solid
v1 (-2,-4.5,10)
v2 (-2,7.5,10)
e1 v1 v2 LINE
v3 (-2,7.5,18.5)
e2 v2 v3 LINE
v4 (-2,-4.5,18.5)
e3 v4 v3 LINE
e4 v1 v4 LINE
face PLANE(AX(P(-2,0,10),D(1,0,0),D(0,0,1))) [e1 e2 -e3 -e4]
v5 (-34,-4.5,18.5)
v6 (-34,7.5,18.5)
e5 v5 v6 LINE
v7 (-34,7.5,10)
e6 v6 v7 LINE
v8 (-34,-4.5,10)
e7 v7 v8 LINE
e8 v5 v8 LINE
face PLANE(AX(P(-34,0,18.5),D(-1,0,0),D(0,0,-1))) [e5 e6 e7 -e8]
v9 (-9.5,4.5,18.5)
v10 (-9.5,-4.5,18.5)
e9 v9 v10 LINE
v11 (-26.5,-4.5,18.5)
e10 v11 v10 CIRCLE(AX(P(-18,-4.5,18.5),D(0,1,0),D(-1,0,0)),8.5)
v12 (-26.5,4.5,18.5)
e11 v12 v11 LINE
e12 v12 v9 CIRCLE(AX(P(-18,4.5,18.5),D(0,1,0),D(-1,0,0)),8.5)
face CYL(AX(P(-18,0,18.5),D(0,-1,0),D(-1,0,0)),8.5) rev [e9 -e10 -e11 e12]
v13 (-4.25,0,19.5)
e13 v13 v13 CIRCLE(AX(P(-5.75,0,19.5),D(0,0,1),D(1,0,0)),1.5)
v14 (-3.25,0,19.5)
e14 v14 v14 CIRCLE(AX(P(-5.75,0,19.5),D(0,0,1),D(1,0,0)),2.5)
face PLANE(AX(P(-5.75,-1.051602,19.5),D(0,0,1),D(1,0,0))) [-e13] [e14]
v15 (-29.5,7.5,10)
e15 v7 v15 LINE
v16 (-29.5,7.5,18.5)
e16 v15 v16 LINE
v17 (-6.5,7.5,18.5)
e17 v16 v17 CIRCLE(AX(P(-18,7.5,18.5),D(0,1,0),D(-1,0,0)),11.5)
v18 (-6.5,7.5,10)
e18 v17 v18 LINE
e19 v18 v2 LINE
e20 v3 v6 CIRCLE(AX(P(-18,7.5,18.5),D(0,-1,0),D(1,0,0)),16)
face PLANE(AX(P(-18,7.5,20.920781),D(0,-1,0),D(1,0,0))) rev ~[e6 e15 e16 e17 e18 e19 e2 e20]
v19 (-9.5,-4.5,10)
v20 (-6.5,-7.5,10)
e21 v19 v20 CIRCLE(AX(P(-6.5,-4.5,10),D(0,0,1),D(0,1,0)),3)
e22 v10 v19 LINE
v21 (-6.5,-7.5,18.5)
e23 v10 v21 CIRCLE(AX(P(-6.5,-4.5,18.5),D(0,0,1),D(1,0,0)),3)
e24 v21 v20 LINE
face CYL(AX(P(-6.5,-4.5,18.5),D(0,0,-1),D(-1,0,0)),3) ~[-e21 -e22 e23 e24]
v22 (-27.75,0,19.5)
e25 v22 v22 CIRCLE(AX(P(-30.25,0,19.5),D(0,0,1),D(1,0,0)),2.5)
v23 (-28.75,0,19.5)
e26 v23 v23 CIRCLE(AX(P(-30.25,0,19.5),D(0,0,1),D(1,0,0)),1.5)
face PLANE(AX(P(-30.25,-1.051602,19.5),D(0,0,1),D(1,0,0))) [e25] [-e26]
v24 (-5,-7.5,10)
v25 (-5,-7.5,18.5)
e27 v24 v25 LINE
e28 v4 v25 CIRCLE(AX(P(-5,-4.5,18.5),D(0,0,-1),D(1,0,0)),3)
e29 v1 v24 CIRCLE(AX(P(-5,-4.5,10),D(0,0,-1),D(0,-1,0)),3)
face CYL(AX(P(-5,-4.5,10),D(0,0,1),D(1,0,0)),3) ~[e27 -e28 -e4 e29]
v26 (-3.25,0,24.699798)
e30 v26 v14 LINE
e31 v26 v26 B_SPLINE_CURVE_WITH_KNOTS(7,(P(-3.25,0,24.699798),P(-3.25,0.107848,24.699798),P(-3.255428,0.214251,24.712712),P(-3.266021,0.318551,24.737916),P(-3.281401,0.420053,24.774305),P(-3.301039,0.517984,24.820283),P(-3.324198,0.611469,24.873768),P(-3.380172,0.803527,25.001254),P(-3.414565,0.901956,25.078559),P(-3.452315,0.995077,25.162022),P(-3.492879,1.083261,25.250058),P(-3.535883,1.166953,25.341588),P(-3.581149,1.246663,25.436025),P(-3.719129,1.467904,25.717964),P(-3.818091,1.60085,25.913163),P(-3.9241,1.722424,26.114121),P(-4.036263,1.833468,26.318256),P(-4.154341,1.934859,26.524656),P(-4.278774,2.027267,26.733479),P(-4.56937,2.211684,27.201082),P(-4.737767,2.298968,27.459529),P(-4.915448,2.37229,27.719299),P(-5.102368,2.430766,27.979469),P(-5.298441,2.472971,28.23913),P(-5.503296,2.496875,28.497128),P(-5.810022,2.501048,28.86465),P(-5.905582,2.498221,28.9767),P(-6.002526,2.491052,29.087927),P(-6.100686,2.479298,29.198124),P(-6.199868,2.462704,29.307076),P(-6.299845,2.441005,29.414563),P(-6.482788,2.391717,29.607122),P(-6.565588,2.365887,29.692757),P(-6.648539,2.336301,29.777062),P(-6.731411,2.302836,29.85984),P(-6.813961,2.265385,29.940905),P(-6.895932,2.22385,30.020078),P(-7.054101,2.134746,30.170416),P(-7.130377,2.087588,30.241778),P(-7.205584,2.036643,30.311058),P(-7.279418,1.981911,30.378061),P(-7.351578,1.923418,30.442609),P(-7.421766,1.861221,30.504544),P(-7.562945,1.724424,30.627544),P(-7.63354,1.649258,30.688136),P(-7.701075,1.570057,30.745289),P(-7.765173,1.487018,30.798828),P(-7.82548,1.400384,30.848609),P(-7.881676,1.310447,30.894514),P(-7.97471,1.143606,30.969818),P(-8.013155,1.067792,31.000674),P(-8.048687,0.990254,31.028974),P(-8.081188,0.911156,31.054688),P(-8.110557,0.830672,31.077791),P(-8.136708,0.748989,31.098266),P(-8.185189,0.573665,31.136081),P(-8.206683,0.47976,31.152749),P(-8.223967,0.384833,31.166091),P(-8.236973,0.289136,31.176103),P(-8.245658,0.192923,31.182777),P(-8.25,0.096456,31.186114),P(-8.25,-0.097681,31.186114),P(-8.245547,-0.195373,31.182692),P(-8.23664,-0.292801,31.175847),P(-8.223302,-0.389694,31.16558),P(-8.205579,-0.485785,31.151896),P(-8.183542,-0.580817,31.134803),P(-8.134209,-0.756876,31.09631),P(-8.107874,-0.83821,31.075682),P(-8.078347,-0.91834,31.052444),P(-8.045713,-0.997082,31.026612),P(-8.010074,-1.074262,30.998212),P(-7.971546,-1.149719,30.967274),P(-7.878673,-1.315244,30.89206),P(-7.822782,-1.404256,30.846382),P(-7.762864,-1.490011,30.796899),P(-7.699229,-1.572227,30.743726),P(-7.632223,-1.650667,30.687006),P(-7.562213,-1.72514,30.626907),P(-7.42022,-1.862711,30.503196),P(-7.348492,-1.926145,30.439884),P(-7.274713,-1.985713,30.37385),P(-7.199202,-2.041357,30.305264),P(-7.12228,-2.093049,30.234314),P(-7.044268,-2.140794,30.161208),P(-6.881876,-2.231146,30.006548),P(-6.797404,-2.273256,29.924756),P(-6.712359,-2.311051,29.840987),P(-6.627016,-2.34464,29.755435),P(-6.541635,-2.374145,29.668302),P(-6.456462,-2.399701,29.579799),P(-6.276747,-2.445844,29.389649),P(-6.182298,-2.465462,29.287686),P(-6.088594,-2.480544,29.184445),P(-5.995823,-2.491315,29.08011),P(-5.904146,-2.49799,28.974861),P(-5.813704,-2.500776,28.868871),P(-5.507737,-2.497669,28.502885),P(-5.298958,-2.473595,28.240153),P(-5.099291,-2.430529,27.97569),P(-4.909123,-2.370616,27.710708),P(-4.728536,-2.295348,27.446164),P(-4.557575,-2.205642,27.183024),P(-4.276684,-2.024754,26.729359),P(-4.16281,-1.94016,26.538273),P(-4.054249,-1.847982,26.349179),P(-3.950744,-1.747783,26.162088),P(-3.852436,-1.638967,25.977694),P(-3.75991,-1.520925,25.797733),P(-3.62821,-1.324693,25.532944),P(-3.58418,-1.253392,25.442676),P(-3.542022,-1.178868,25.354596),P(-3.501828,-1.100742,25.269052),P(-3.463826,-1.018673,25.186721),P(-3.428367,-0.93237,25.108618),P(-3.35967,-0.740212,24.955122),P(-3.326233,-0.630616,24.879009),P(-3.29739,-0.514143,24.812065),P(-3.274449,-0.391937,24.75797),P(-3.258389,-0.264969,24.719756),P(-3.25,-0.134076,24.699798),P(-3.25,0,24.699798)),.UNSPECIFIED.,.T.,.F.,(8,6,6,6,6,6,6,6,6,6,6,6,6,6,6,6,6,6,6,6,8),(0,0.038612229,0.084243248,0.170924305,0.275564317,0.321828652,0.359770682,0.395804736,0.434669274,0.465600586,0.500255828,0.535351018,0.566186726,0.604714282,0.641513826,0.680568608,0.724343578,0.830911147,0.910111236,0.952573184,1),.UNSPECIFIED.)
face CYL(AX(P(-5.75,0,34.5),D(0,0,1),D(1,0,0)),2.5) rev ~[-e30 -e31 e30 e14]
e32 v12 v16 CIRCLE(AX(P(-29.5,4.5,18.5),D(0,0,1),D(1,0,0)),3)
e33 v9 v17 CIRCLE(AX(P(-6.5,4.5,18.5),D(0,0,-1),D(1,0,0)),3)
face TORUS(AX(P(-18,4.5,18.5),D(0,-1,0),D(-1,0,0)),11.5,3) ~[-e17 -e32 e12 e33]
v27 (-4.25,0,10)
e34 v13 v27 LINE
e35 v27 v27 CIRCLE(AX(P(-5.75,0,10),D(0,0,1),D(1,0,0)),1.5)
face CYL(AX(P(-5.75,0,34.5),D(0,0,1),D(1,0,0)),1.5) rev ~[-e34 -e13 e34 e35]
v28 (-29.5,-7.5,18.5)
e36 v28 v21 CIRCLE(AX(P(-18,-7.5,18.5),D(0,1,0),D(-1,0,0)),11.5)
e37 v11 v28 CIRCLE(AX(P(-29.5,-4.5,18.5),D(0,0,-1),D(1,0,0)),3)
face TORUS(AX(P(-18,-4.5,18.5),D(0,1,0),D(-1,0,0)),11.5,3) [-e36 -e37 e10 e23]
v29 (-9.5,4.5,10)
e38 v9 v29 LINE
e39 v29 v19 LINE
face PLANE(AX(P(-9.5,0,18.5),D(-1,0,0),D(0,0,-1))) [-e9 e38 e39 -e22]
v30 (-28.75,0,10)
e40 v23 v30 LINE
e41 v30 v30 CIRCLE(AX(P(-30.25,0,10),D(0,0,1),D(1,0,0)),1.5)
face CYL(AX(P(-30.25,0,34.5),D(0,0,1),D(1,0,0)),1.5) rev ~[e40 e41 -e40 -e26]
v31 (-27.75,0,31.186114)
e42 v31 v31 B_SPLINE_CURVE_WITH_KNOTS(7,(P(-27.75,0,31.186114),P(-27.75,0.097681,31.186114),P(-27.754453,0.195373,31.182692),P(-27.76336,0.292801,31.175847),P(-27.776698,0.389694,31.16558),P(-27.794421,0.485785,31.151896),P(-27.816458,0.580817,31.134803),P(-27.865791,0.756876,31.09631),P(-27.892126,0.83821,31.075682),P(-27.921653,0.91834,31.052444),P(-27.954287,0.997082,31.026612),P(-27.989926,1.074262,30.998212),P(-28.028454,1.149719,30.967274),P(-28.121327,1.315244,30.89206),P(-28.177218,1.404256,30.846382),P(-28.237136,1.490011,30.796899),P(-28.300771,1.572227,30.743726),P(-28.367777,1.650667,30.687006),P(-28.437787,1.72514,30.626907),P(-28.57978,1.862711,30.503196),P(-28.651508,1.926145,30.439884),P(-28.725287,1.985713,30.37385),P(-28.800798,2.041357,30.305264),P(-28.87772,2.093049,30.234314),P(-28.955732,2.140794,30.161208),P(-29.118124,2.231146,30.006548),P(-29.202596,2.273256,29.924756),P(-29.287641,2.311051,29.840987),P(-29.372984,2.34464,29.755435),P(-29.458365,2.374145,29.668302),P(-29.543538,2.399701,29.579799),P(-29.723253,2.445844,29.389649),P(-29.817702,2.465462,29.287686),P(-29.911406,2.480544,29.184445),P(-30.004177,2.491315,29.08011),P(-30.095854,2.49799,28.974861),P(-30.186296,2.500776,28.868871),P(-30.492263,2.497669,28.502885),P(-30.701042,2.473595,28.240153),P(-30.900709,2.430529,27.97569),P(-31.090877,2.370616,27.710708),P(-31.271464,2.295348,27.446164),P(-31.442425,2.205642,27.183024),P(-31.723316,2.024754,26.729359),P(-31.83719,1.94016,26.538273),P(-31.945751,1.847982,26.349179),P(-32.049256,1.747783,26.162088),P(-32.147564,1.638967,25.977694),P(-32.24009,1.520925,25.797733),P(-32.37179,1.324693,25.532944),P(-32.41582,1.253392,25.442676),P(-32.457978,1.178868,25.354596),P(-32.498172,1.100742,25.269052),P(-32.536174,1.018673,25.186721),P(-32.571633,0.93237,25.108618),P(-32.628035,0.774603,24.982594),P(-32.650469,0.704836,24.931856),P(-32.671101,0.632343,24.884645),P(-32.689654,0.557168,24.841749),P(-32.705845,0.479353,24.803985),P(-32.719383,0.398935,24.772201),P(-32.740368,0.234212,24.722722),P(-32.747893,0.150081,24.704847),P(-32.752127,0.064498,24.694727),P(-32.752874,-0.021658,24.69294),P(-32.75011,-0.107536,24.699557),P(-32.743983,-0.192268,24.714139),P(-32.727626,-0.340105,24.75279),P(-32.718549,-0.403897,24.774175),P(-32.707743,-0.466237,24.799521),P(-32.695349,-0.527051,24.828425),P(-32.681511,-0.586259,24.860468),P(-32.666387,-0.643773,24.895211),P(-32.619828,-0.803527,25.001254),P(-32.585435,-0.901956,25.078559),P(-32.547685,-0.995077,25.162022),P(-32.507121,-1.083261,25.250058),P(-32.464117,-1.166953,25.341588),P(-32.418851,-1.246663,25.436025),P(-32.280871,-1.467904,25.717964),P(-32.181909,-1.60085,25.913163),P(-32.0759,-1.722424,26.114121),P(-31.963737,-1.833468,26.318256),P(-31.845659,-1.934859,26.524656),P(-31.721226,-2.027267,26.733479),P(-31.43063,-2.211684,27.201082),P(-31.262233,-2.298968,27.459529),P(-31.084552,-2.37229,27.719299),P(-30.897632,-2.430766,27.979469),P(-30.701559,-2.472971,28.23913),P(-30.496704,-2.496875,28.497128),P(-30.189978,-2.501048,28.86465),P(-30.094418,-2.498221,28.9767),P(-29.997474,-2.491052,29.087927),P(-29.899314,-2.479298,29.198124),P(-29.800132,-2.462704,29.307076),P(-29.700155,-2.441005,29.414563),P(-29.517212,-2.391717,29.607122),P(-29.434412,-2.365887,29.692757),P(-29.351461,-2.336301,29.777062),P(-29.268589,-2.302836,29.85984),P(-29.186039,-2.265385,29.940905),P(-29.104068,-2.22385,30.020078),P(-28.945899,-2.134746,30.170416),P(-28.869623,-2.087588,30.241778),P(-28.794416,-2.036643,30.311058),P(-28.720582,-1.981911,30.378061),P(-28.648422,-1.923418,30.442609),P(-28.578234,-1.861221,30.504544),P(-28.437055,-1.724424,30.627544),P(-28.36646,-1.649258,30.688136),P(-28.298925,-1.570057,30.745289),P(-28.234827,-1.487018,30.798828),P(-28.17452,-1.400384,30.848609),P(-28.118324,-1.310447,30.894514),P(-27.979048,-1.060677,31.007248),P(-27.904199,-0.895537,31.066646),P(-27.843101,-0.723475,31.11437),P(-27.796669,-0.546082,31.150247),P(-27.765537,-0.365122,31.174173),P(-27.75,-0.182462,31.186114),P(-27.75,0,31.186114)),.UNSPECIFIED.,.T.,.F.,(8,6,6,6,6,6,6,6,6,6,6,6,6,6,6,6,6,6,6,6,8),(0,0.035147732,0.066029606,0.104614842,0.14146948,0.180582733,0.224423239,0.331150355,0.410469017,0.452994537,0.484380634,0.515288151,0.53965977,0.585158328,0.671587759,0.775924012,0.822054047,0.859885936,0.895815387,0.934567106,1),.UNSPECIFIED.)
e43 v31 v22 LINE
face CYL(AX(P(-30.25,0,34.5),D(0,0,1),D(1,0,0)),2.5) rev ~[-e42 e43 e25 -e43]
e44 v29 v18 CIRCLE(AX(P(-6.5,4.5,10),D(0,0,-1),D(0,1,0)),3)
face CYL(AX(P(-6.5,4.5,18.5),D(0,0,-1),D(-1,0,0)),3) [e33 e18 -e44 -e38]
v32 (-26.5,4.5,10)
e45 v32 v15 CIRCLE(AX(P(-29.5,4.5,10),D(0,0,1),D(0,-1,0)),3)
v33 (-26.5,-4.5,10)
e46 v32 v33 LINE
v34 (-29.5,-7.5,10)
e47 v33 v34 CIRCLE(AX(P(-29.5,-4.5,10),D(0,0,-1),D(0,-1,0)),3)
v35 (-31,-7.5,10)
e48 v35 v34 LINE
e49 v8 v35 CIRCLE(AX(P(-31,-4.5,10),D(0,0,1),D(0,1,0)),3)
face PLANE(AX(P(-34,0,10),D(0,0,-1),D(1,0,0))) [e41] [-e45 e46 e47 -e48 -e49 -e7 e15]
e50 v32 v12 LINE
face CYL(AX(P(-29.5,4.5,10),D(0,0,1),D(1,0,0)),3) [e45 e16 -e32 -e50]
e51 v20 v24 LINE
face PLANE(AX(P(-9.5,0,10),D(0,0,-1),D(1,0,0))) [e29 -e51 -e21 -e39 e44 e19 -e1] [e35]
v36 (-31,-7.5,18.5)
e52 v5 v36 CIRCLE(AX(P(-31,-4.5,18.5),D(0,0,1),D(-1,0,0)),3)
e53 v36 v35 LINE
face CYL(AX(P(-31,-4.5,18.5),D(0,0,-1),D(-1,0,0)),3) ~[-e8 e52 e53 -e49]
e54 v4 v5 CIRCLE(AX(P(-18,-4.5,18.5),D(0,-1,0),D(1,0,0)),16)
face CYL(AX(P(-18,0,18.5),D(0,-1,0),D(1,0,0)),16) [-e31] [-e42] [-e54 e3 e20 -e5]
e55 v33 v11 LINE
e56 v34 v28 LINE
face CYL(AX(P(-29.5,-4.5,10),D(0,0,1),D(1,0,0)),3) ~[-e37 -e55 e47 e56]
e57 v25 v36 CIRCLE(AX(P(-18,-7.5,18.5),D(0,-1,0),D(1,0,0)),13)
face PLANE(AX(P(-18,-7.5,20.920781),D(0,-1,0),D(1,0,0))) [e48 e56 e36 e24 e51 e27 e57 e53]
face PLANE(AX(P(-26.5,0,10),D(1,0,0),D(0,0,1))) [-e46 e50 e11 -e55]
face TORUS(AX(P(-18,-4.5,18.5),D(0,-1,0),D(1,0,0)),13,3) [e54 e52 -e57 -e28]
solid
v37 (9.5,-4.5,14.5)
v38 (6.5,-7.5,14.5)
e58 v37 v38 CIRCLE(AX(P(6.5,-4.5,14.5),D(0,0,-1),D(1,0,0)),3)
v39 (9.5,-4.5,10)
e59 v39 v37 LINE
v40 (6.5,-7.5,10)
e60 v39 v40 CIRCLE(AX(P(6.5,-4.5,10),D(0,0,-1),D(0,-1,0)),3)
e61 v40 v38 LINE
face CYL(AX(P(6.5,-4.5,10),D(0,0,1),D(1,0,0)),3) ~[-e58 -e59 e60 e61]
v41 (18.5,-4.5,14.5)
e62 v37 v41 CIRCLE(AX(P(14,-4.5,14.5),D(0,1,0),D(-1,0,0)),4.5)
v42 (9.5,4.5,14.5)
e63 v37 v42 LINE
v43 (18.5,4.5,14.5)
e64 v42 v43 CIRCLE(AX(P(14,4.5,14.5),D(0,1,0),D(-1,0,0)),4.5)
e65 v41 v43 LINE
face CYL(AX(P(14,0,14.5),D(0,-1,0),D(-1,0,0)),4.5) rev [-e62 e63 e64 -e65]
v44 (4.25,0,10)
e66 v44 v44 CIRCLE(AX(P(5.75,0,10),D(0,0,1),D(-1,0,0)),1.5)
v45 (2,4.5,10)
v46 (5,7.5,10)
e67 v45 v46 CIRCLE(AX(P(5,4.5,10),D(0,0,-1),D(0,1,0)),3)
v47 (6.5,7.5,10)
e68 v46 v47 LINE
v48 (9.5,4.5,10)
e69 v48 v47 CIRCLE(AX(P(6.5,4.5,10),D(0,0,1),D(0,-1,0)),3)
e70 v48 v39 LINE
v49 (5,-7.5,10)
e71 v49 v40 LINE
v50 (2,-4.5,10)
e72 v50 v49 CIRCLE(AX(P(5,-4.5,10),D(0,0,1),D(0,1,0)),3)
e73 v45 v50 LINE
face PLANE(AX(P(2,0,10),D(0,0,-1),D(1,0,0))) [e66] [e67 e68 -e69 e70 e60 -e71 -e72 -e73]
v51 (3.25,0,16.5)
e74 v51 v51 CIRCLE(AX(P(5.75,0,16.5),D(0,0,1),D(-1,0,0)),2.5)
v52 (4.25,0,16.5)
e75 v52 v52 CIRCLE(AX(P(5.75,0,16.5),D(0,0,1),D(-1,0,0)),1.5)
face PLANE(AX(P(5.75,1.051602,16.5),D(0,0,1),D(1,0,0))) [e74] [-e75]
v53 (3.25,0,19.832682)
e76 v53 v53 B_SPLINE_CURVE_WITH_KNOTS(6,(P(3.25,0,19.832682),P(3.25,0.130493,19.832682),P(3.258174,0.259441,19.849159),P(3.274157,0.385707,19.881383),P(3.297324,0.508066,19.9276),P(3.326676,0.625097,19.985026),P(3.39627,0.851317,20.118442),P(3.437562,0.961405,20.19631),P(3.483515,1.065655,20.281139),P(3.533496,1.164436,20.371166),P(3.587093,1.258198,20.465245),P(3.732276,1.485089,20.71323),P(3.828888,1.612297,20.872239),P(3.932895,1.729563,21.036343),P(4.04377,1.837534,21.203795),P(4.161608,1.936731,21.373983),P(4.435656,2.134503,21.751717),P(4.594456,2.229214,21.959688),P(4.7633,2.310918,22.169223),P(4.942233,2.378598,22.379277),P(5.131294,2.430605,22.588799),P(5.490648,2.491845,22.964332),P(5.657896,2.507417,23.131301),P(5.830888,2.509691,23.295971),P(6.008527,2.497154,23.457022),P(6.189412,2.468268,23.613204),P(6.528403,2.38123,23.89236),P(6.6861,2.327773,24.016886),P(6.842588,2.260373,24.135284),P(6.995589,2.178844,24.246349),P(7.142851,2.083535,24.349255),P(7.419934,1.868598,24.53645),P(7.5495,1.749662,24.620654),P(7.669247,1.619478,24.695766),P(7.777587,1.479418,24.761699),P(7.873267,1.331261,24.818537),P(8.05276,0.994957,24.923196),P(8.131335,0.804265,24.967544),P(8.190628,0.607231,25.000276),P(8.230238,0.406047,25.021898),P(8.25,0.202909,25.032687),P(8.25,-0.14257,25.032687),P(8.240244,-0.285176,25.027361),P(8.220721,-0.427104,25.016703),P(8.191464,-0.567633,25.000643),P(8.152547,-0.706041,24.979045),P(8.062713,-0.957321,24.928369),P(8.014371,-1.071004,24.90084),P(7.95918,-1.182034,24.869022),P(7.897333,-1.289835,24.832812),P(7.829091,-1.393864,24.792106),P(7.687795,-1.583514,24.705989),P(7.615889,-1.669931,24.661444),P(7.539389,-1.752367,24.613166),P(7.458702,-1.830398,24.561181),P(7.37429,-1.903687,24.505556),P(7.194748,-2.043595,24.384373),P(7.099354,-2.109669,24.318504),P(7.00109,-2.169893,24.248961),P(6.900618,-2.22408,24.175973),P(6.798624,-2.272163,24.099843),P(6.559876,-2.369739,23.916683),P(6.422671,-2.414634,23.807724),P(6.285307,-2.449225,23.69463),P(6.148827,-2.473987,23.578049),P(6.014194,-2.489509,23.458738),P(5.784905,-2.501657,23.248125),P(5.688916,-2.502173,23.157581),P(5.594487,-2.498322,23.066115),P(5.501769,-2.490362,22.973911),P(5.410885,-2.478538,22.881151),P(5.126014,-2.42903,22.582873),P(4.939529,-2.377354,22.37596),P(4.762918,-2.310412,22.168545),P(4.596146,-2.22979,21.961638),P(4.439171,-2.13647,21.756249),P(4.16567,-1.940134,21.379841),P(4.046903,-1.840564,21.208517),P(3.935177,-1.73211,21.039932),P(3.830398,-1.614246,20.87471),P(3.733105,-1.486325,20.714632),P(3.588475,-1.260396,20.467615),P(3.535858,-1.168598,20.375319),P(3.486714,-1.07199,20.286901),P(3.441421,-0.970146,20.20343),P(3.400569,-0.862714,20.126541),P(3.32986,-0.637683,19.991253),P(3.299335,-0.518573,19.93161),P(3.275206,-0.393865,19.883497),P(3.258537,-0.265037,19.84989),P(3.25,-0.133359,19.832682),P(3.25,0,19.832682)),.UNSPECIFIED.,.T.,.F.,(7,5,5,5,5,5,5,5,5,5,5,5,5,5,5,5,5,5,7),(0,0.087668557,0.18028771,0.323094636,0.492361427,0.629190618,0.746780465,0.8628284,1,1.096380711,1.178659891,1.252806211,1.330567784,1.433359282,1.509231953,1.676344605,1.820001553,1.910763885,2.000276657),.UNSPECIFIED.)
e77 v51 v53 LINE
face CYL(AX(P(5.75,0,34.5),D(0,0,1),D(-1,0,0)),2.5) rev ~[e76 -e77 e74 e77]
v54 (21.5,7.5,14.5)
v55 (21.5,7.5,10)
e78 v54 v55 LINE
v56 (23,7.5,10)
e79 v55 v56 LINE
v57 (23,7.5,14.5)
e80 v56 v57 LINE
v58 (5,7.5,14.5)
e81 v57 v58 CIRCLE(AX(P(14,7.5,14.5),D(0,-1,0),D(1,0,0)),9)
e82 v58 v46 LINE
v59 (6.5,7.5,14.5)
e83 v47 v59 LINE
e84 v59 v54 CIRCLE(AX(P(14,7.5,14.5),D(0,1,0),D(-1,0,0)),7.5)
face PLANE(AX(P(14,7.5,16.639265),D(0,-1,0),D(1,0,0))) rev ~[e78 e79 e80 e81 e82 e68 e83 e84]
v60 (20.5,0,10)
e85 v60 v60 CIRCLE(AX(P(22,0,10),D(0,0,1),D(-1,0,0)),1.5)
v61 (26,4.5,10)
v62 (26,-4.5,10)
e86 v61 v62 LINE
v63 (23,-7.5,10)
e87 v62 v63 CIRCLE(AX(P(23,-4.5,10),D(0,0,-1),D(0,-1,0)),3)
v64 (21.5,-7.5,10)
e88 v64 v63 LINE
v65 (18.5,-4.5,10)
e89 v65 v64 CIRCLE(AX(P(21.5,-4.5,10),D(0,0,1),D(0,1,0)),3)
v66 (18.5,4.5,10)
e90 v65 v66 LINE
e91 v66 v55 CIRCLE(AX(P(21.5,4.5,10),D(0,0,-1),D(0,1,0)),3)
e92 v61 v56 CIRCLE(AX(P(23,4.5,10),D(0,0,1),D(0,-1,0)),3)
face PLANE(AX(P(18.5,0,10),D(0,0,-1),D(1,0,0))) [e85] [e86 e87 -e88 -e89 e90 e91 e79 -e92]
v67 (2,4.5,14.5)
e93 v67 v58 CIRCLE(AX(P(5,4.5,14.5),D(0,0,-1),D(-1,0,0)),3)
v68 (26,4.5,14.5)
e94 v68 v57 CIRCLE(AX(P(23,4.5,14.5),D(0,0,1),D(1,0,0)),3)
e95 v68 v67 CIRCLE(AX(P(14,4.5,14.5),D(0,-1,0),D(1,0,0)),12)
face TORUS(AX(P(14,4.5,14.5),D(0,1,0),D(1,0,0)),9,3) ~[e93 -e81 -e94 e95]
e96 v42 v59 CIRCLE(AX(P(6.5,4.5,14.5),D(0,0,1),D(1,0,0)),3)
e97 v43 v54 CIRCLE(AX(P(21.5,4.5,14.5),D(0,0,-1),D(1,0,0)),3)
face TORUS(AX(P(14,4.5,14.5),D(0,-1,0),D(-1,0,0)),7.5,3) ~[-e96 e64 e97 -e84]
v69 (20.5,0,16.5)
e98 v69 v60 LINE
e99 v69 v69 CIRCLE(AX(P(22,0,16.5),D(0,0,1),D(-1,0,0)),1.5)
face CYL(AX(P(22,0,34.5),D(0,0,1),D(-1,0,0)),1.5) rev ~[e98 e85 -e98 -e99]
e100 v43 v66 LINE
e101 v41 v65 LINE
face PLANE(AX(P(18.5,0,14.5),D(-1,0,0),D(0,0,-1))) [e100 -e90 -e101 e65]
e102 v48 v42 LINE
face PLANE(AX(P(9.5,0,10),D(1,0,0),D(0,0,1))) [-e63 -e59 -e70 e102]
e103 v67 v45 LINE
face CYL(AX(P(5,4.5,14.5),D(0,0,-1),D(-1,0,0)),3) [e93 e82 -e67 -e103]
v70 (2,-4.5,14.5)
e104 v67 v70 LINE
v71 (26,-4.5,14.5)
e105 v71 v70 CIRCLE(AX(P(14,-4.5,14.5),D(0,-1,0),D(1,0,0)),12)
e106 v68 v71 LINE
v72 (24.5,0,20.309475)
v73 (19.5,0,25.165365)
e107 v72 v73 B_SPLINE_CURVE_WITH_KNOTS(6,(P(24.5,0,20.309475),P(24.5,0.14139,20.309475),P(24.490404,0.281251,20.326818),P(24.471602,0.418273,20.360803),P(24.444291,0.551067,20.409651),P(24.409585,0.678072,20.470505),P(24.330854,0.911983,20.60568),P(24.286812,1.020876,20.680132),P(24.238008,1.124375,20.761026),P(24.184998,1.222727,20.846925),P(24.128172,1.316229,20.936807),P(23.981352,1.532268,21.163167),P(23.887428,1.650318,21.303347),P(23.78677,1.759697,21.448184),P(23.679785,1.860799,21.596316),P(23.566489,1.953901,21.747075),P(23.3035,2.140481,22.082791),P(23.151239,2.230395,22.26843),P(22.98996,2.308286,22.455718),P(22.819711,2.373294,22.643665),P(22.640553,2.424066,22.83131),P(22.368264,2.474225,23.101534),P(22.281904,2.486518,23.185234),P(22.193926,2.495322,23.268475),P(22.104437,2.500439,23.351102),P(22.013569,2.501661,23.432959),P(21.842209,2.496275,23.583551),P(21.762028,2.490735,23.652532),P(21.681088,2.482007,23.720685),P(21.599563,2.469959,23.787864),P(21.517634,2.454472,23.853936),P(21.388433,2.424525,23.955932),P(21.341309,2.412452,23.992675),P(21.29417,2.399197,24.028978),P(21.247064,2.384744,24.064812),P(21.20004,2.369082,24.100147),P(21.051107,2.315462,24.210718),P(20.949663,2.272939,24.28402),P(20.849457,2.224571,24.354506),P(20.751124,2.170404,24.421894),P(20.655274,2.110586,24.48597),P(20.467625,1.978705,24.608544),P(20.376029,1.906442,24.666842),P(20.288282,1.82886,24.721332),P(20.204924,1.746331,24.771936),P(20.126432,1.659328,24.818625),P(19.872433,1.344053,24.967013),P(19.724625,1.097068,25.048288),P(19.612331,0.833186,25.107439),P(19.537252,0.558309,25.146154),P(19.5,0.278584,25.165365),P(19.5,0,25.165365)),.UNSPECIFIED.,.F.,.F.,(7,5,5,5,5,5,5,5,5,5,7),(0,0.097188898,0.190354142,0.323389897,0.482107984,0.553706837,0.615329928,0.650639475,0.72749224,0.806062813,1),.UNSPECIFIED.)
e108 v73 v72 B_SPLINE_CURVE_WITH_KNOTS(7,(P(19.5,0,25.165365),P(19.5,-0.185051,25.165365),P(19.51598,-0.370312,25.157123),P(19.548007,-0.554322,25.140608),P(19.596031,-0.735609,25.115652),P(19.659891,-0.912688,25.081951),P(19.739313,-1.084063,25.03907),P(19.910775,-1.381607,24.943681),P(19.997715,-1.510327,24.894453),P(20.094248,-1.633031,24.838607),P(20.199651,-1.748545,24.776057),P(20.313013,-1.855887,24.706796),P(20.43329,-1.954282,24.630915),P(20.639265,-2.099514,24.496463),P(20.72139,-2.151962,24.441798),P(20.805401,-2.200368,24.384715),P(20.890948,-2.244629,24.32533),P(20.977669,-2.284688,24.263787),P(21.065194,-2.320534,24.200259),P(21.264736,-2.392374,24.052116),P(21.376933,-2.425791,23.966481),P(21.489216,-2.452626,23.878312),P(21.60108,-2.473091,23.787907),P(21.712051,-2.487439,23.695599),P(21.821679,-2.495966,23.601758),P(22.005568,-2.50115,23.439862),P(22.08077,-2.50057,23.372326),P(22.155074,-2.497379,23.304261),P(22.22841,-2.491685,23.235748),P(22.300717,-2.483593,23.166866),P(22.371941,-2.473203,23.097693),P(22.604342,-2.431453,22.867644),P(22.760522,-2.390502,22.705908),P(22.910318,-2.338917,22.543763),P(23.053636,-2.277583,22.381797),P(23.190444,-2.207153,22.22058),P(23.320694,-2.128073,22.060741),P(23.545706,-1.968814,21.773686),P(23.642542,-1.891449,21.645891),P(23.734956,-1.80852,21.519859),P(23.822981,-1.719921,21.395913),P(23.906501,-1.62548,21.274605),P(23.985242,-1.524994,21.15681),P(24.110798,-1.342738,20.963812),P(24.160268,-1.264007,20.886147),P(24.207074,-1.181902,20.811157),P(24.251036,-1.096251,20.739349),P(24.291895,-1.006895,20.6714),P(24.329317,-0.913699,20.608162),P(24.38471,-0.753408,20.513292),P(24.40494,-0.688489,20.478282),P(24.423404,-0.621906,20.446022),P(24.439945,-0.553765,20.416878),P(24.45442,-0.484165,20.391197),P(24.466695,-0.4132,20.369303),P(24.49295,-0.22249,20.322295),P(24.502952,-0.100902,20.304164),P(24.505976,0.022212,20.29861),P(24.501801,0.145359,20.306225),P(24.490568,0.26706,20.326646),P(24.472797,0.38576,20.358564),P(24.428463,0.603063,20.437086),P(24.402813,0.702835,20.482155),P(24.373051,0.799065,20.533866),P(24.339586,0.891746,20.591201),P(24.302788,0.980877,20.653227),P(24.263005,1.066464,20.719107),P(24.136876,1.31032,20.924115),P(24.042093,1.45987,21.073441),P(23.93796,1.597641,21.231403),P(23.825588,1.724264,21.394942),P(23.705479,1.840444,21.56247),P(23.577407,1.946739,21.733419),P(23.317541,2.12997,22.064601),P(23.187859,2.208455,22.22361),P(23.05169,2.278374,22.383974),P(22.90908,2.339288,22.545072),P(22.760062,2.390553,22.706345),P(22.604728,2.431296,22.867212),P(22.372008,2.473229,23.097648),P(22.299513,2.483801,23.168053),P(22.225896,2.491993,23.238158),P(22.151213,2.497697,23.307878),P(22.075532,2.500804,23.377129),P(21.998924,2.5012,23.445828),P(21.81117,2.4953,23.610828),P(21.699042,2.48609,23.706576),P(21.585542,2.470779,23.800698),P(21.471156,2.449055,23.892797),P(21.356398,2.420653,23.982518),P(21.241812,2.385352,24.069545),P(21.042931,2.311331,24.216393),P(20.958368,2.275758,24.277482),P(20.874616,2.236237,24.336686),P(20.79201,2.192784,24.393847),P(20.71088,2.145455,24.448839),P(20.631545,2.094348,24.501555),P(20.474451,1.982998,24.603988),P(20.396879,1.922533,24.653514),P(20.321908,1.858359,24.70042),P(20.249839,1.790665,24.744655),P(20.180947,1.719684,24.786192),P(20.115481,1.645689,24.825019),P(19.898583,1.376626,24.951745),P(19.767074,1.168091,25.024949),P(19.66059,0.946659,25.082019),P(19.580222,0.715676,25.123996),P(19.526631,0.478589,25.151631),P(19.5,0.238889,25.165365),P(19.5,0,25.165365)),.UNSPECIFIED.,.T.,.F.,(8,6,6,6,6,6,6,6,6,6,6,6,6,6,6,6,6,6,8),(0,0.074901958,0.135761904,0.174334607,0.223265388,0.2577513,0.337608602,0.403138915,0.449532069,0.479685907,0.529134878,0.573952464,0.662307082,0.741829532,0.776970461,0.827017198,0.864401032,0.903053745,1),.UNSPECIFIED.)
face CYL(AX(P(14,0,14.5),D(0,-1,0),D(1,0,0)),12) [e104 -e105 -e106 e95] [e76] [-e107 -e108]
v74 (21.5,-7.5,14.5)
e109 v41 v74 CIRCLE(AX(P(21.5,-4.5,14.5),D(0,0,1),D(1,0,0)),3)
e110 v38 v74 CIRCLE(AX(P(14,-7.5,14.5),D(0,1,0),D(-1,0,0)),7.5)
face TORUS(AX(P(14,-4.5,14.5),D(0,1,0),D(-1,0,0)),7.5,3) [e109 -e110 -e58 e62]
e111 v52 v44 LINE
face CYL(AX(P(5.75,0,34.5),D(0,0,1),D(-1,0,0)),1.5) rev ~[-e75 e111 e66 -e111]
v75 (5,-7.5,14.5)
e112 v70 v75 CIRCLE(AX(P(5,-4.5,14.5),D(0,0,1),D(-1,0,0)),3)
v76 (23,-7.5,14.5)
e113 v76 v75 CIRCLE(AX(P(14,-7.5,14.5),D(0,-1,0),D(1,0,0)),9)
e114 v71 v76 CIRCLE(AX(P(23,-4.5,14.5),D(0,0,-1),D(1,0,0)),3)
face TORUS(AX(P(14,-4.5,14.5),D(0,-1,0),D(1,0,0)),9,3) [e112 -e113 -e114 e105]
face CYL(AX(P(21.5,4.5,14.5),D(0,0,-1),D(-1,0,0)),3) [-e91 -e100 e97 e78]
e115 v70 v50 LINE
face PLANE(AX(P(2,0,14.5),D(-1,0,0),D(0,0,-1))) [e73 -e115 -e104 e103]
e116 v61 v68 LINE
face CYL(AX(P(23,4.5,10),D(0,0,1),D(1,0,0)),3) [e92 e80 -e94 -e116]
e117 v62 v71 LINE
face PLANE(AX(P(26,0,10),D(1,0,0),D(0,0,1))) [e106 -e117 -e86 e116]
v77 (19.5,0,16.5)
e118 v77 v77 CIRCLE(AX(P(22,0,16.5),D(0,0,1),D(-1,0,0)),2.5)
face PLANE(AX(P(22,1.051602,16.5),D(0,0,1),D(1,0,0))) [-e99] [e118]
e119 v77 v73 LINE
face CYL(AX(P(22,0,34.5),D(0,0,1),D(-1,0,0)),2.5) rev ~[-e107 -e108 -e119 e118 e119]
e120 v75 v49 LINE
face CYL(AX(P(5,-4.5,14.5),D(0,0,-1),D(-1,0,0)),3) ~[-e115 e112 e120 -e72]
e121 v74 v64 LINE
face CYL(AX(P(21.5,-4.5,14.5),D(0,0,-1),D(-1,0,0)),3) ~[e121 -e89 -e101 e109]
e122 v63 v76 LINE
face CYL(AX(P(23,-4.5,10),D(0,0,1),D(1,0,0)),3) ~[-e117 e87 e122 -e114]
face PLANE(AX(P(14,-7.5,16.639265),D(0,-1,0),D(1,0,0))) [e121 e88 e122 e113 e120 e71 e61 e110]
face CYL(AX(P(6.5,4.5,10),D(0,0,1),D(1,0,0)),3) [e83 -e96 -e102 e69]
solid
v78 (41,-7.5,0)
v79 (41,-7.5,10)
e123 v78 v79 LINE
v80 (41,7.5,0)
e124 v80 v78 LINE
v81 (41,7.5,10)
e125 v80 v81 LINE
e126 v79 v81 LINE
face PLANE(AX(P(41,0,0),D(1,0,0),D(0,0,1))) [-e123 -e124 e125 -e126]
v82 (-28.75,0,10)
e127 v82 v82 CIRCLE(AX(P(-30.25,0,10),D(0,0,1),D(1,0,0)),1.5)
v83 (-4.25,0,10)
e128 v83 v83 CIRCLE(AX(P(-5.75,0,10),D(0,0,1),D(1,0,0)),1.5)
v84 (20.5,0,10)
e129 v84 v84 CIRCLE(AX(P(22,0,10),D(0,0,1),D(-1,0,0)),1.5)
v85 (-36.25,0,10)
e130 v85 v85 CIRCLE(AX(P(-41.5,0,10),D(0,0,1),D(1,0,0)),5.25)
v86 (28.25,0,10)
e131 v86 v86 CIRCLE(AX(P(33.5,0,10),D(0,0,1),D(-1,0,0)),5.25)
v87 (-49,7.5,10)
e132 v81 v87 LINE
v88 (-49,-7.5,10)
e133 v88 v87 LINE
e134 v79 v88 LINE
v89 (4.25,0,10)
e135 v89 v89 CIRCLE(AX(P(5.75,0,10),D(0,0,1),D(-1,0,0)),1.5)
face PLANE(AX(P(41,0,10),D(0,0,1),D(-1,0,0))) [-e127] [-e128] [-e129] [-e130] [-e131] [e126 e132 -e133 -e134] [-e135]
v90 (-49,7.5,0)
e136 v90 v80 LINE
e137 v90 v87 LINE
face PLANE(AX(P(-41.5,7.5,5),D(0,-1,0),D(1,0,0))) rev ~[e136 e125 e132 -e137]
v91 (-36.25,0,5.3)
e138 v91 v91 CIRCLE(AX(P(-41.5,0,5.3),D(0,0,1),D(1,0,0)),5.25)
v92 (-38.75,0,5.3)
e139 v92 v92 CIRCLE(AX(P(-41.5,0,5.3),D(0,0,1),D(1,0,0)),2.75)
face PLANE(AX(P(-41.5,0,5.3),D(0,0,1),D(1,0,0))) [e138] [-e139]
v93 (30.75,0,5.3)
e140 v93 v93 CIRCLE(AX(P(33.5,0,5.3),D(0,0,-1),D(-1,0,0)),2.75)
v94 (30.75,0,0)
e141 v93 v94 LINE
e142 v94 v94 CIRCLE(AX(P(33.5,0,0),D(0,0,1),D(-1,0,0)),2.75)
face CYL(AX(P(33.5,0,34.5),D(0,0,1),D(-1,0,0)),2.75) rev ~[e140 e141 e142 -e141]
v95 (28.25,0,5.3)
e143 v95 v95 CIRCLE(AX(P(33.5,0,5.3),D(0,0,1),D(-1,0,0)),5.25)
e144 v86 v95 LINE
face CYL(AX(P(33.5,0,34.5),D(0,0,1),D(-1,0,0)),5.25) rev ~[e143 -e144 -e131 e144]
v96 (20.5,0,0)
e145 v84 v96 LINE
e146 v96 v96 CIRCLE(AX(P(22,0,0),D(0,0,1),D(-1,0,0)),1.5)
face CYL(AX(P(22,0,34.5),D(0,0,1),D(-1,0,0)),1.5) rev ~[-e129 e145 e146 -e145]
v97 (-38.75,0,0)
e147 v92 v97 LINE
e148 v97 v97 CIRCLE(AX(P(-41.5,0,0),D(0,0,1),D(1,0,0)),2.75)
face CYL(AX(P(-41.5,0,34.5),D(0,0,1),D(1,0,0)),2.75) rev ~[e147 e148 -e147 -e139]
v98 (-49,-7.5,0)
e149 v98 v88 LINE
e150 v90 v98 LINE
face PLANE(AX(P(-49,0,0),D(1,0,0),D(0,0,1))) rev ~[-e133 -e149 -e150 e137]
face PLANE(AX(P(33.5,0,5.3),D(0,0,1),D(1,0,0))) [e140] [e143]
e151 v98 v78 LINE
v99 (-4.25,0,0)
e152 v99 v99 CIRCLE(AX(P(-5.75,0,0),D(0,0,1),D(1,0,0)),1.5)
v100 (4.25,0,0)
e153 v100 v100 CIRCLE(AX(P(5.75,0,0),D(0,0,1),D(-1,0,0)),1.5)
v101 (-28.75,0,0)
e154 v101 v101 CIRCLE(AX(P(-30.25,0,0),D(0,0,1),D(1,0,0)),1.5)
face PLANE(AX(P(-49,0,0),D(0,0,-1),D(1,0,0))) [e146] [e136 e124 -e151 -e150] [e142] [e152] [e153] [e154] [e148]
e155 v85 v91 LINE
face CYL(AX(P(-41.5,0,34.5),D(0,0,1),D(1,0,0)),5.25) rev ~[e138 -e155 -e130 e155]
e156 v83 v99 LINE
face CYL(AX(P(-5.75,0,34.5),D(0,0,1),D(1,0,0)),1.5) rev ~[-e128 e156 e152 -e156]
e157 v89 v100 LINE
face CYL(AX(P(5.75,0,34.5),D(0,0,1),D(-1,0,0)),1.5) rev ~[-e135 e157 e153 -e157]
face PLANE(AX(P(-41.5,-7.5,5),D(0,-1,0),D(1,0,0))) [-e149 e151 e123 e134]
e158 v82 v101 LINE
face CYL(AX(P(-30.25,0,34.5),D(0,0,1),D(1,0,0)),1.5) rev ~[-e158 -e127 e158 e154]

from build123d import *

# Parameters (mm, degrees)
F0_W     = 15
F0_H     = 10
F1_DEPTH = 7.5
F2_DEPTH = 7.5
F4_R     = 2.75
F5_DEPTH = 40
F6_DEPTH = 15
F7_DEPTH = 18
F4_R_2   = 5.25
F8_DEPTH = 29.2
F9_R     = 3
F9_2_R   = 3


with BuildPart() as f1:
    # F0 (on Front) → F1 (new body, symmetric)
    with BuildSketch(Plane.XZ):
        with Locations((-41.5, 5)):
            Rectangle(F0_W, F0_H)
        Polygon((-34, 0), (0, 0), (26, 0), (26, 10), (18.5, 10), (9.5, 10), (2.5, 10), (2, 10), (-2, 10), (-9.5, 10), (-26.5, 10), (-34, 10), align=None)
        with Locations((33.5, 5)):
            Rectangle(F0_W, F0_H)
    extrude(amount=F1_DEPTH, both=True)


with BuildPart() as f2:
    # F0 (on Front) → F2 (new body, symmetric)
    with BuildSketch(Plane.XZ):
        with BuildLine():
            Line((-34, 18.5), (-34, 10))
            Line((-34, 10), (-26.5, 10))
            Line((-26.5, 10), (-26.5, 18.5))
            ThreePointArc((-26.5, 18.5), (-18, 27), (-9.5, 18.5))
            Line((-9.5, 18.5), (-9.5, 10))
            Line((-9.5, 10), (-2, 10))
            Line((-2, 10), (-2, 18.5))
            ThreePointArc((-2, 18.5), (-18, 34.5), (-34, 18.5))
        make_face()
    extrude(amount=F2_DEPTH, both=True)


with BuildPart() as f2b:
    # F0 (on Front) → F2, piece 2 (new body, symmetric)
    with BuildSketch(Plane.XZ):
        with BuildLine():
            Line((18.5, 10), (26, 10))
            Line((26, 10), (26, 14.5))
            ThreePointArc((26, 14.5), (14, 26.5), (2, 14.5))
            Line((2, 14.5), (2, 10))
            Line((2, 10), (2.5, 10))
            Line((2.5, 10), (9.5, 10))
            Line((9.5, 10), (9.5, 14.5))
            ThreePointArc((9.5, 14.5), (14, 19), (18.5, 14.5))
            Line((18.5, 14.5), (18.5, 10))
        make_face()
    extrude(amount=F2_DEPTH, both=True)


with BuildPart() as f5_tool:
    # F4 (on offset) → F5 (new body)
    with BuildSketch(Plane.XY.offset(34.5)):
        with Locations((-41.5, 0)):
            Circle(F4_R)
        with BuildLine():
            ThreePointArc((36.25, 0), (33.5, 2.75), (30.75, 0))
            ThreePointArc((30.75, 0), (33.5, -2.75), (36.25, 0))
        make_face()
        with BuildLine():
            ThreePointArc((-7.25, 0), (-5.75, -1.5), (-4.25, 0))
            Line((-4.25, 0), (-5.75, 0))
            Line((-5.75, 0), (-7.25, 0))
        make_face()
        with BuildLine():
            Line((-5.75, 0), (-4.25, 0))
            ThreePointArc((-4.25, 0), (-5.75, 1.5), (-7.25, 0))
            Line((-7.25, 0), (-5.75, 0))
        make_face()
        with BuildLine():
            ThreePointArc((7.25, 0), (5.75, 1.5), (4.25, 0))
            Line((4.25, 0), (5.75, 0))
            Line((5.75, 0), (7.25, 0))
        make_face()
        with BuildLine():
            Line((5.75, 0), (4.25, 0))
            ThreePointArc((4.25, 0), (5.75, -1.5), (7.25, 0))
            Line((7.25, 0), (5.75, 0))
        make_face()
        with BuildLine():
            ThreePointArc((-31.75, 0), (-30.25, -1.5), (-28.75, 0))
            Line((-28.75, 0), (-30.25, 0))
            Line((-30.25, 0), (-31.75, 0))
        make_face()
        with BuildLine():
            Line((-30.25, 0), (-28.75, 0))
            ThreePointArc((-28.75, 0), (-30.25, 1.5), (-31.75, 0))
            Line((-31.75, 0), (-30.25, 0))
        make_face()
        with BuildLine():
            ThreePointArc((23.5, 0), (22, 1.5), (20.5, 0))
            Line((20.5, 0), (22, 0))
            Line((22, 0), (23.5, 0))
        make_face()
        with BuildLine():
            Line((22, 0), (20.5, 0))
            ThreePointArc((20.5, 0), (22, -1.5), (23.5, 0))
            Line((23.5, 0), (22, 0))
        make_face()
    extrude(amount=-F5_DEPTH)


with BuildPart() as f1_1:
    add(f1.part)

    # F5: cut by f5_tool
    add(f5_tool.part, mode=Mode.SUBTRACT)

    # F4 (on offset) → F8 (cut)
    with BuildSketch(Plane.XY.offset(34.5)):
        with Locations((-41.5, 0)):
            Circle(F4_R_2)
        with Locations((-41.5, 0)):
            Circle(F4_R, mode=Mode.SUBTRACT)
        with BuildLine():
            ThreePointArc((38.75, 0), (33.5, 5.25), (28.25, 0))
            ThreePointArc((28.25, 0), (33.5, -5.25), (38.75, 0))
        make_face()
        with BuildLine():
            ThreePointArc((36.25, 0), (33.5, -2.75), (30.75, 0))
            ThreePointArc((30.75, 0), (33.5, 2.75), (36.25, 0))
        make_face(mode=Mode.SUBTRACT)
    extrude(amount=-F8_DEPTH, mode=Mode.SUBTRACT)


with BuildPart() as f2_1:
    add(f2.part)

    # F5: cut by f5_tool
    add(f5_tool.part, mode=Mode.SUBTRACT)


with BuildPart() as f2b_1:
    add(f2b.part)

    # F5: cut by f5_tool
    add(f5_tool.part, mode=Mode.SUBTRACT)


with BuildPart() as f6_tool:
    # F4 (on offset) → F6 (new body)
    with BuildSketch(Plane.XY.offset(34.5)):
        with BuildLine():
            ThreePointArc((-32.75, 0), (-30.25, -2.5), (-27.75, 0))
            Line((-27.75, 0), (-28.75, 0))
            ThreePointArc((-28.75, 0), (-30.25, -1.5), (-31.75, 0))
            Line((-31.75, 0), (-32.75, 0))
        make_face()
        with BuildLine():
            Line((-28.75, 0), (-27.75, 0))
            ThreePointArc((-27.75, 0), (-30.25, 2.5), (-32.75, 0))
            Line((-32.75, 0), (-31.75, 0))
            ThreePointArc((-31.75, 0), (-30.25, 1.5), (-28.75, 0))
        make_face()
        with BuildLine():
            ThreePointArc((-8.25, 0), (-5.75, -2.5), (-3.25, 0))
            Line((-3.25, 0), (-4.25, 0))
            ThreePointArc((-4.25, 0), (-5.75, -1.5), (-7.25, 0))
            Line((-7.25, 0), (-8.25, 0))
        make_face()
        with BuildLine():
            Line((-4.25, 0), (-3.25, 0))
            ThreePointArc((-3.25, 0), (-5.75, 2.5), (-8.25, 0))
            Line((-8.25, 0), (-7.25, 0))
            ThreePointArc((-7.25, 0), (-5.75, 1.5), (-4.25, 0))
        make_face()
        with BuildLine():
            ThreePointArc((24.5, 0), (22, 2.5), (19.5, 0))
            Line((19.5, 0), (20.5, 0))
            ThreePointArc((20.5, 0), (22, 1.5), (23.5, 0))
            Line((23.5, 0), (24.5, 0))
        make_face()
        with BuildLine():
            ThreePointArc((8.25, 0), (5.75, 2.5), (3.25, 0))
            Line((3.25, 0), (4.25, 0))
            ThreePointArc((4.25, 0), (5.75, 1.5), (7.25, 0))
            Line((7.25, 0), (8.25, 0))
        make_face()
    extrude(amount=-F6_DEPTH)


with BuildPart() as f2_2:
    add(f2_1.part)

    # F6: cut by f6_tool
    add(f6_tool.part, mode=Mode.SUBTRACT)

    # F9
    f9_edges = [f2_2.edges().sort_by_distance(p)[0] for p in [
        (-18, -7.5, 34.5),
        (-18, -7.5, 27),
        (-18, 7.5, 27),
        (-34, -7.5, 14.25),
        (-9.5, 7.5, 14.25),
        (-9.5, -7.5, 14.25),
        (-26.5, 7.5, 14.25),
        (-26.5, -7.5, 14.25),
        (-2, -7.5, 14.25),
    ]]
    fillet(f9_edges, radius=F9_R)


with BuildPart() as f2b_2:
    add(f2b_1.part)

    # F6: cut by f6_tool
    add(f6_tool.part, mode=Mode.SUBTRACT)

    # F4 (on offset) → F7 (cut)
    with BuildSketch(Plane.XY.offset(34.5)):
        with BuildLine():
            ThreePointArc((24.5, 0), (22, 2.5), (19.5, 0))
            Line((19.5, 0), (20.5, 0))
            ThreePointArc((20.5, 0), (22, 1.5), (23.5, 0))
            Line((23.5, 0), (24.5, 0))
        make_face()
        with BuildLine():
            Line((20.5, 0), (19.5, 0))
            ThreePointArc((19.5, 0), (22, -2.5), (24.5, 0))
            Line((24.5, 0), (23.5, 0))
            ThreePointArc((23.5, 0), (22, -1.5), (20.5, 0))
        make_face()
        with BuildLine():
            ThreePointArc((8.25, 0), (5.75, 2.5), (3.25, 0))
            Line((3.25, 0), (4.25, 0))
            ThreePointArc((4.25, 0), (5.75, 1.5), (7.25, 0))
            Line((7.25, 0), (8.25, 0))
        make_face()
        with BuildLine():
            Line((4.25, 0), (3.25, 0))
            ThreePointArc((3.25, 0), (5.75, -2.5), (8.25, 0))
            Line((8.25, 0), (7.25, 0))
            ThreePointArc((7.25, 0), (5.75, -1.5), (4.25, 0))
        make_face()
    extrude(amount=-F7_DEPTH, mode=Mode.SUBTRACT)

    # F9#2
    f9_2_edges = [f2b_2.edges().sort_by_distance(p)[0] for p in [
        (14, -7.5, 26.5),
        (14, -7.5, 19),
        (14, 7.5, 19),
        (14, 7.5, 26.5),
        (18.5, 7.5, 12.25),
        (18.5, -7.5, 12.25),
        (26, 7.5, 12.25),
        (26, -7.5, 12.25),
        (2, 7.5, 12.25),
        (2, -7.5, 12.25),
        (9.5, -7.5, 12.25),
        (9.5, 7.5, 12.25),
    ]]
    fillet(f9_2_edges, radius=F9_2_R)


solid = Compound([f1_1.part, f2_2.part, f2b_2.part])
